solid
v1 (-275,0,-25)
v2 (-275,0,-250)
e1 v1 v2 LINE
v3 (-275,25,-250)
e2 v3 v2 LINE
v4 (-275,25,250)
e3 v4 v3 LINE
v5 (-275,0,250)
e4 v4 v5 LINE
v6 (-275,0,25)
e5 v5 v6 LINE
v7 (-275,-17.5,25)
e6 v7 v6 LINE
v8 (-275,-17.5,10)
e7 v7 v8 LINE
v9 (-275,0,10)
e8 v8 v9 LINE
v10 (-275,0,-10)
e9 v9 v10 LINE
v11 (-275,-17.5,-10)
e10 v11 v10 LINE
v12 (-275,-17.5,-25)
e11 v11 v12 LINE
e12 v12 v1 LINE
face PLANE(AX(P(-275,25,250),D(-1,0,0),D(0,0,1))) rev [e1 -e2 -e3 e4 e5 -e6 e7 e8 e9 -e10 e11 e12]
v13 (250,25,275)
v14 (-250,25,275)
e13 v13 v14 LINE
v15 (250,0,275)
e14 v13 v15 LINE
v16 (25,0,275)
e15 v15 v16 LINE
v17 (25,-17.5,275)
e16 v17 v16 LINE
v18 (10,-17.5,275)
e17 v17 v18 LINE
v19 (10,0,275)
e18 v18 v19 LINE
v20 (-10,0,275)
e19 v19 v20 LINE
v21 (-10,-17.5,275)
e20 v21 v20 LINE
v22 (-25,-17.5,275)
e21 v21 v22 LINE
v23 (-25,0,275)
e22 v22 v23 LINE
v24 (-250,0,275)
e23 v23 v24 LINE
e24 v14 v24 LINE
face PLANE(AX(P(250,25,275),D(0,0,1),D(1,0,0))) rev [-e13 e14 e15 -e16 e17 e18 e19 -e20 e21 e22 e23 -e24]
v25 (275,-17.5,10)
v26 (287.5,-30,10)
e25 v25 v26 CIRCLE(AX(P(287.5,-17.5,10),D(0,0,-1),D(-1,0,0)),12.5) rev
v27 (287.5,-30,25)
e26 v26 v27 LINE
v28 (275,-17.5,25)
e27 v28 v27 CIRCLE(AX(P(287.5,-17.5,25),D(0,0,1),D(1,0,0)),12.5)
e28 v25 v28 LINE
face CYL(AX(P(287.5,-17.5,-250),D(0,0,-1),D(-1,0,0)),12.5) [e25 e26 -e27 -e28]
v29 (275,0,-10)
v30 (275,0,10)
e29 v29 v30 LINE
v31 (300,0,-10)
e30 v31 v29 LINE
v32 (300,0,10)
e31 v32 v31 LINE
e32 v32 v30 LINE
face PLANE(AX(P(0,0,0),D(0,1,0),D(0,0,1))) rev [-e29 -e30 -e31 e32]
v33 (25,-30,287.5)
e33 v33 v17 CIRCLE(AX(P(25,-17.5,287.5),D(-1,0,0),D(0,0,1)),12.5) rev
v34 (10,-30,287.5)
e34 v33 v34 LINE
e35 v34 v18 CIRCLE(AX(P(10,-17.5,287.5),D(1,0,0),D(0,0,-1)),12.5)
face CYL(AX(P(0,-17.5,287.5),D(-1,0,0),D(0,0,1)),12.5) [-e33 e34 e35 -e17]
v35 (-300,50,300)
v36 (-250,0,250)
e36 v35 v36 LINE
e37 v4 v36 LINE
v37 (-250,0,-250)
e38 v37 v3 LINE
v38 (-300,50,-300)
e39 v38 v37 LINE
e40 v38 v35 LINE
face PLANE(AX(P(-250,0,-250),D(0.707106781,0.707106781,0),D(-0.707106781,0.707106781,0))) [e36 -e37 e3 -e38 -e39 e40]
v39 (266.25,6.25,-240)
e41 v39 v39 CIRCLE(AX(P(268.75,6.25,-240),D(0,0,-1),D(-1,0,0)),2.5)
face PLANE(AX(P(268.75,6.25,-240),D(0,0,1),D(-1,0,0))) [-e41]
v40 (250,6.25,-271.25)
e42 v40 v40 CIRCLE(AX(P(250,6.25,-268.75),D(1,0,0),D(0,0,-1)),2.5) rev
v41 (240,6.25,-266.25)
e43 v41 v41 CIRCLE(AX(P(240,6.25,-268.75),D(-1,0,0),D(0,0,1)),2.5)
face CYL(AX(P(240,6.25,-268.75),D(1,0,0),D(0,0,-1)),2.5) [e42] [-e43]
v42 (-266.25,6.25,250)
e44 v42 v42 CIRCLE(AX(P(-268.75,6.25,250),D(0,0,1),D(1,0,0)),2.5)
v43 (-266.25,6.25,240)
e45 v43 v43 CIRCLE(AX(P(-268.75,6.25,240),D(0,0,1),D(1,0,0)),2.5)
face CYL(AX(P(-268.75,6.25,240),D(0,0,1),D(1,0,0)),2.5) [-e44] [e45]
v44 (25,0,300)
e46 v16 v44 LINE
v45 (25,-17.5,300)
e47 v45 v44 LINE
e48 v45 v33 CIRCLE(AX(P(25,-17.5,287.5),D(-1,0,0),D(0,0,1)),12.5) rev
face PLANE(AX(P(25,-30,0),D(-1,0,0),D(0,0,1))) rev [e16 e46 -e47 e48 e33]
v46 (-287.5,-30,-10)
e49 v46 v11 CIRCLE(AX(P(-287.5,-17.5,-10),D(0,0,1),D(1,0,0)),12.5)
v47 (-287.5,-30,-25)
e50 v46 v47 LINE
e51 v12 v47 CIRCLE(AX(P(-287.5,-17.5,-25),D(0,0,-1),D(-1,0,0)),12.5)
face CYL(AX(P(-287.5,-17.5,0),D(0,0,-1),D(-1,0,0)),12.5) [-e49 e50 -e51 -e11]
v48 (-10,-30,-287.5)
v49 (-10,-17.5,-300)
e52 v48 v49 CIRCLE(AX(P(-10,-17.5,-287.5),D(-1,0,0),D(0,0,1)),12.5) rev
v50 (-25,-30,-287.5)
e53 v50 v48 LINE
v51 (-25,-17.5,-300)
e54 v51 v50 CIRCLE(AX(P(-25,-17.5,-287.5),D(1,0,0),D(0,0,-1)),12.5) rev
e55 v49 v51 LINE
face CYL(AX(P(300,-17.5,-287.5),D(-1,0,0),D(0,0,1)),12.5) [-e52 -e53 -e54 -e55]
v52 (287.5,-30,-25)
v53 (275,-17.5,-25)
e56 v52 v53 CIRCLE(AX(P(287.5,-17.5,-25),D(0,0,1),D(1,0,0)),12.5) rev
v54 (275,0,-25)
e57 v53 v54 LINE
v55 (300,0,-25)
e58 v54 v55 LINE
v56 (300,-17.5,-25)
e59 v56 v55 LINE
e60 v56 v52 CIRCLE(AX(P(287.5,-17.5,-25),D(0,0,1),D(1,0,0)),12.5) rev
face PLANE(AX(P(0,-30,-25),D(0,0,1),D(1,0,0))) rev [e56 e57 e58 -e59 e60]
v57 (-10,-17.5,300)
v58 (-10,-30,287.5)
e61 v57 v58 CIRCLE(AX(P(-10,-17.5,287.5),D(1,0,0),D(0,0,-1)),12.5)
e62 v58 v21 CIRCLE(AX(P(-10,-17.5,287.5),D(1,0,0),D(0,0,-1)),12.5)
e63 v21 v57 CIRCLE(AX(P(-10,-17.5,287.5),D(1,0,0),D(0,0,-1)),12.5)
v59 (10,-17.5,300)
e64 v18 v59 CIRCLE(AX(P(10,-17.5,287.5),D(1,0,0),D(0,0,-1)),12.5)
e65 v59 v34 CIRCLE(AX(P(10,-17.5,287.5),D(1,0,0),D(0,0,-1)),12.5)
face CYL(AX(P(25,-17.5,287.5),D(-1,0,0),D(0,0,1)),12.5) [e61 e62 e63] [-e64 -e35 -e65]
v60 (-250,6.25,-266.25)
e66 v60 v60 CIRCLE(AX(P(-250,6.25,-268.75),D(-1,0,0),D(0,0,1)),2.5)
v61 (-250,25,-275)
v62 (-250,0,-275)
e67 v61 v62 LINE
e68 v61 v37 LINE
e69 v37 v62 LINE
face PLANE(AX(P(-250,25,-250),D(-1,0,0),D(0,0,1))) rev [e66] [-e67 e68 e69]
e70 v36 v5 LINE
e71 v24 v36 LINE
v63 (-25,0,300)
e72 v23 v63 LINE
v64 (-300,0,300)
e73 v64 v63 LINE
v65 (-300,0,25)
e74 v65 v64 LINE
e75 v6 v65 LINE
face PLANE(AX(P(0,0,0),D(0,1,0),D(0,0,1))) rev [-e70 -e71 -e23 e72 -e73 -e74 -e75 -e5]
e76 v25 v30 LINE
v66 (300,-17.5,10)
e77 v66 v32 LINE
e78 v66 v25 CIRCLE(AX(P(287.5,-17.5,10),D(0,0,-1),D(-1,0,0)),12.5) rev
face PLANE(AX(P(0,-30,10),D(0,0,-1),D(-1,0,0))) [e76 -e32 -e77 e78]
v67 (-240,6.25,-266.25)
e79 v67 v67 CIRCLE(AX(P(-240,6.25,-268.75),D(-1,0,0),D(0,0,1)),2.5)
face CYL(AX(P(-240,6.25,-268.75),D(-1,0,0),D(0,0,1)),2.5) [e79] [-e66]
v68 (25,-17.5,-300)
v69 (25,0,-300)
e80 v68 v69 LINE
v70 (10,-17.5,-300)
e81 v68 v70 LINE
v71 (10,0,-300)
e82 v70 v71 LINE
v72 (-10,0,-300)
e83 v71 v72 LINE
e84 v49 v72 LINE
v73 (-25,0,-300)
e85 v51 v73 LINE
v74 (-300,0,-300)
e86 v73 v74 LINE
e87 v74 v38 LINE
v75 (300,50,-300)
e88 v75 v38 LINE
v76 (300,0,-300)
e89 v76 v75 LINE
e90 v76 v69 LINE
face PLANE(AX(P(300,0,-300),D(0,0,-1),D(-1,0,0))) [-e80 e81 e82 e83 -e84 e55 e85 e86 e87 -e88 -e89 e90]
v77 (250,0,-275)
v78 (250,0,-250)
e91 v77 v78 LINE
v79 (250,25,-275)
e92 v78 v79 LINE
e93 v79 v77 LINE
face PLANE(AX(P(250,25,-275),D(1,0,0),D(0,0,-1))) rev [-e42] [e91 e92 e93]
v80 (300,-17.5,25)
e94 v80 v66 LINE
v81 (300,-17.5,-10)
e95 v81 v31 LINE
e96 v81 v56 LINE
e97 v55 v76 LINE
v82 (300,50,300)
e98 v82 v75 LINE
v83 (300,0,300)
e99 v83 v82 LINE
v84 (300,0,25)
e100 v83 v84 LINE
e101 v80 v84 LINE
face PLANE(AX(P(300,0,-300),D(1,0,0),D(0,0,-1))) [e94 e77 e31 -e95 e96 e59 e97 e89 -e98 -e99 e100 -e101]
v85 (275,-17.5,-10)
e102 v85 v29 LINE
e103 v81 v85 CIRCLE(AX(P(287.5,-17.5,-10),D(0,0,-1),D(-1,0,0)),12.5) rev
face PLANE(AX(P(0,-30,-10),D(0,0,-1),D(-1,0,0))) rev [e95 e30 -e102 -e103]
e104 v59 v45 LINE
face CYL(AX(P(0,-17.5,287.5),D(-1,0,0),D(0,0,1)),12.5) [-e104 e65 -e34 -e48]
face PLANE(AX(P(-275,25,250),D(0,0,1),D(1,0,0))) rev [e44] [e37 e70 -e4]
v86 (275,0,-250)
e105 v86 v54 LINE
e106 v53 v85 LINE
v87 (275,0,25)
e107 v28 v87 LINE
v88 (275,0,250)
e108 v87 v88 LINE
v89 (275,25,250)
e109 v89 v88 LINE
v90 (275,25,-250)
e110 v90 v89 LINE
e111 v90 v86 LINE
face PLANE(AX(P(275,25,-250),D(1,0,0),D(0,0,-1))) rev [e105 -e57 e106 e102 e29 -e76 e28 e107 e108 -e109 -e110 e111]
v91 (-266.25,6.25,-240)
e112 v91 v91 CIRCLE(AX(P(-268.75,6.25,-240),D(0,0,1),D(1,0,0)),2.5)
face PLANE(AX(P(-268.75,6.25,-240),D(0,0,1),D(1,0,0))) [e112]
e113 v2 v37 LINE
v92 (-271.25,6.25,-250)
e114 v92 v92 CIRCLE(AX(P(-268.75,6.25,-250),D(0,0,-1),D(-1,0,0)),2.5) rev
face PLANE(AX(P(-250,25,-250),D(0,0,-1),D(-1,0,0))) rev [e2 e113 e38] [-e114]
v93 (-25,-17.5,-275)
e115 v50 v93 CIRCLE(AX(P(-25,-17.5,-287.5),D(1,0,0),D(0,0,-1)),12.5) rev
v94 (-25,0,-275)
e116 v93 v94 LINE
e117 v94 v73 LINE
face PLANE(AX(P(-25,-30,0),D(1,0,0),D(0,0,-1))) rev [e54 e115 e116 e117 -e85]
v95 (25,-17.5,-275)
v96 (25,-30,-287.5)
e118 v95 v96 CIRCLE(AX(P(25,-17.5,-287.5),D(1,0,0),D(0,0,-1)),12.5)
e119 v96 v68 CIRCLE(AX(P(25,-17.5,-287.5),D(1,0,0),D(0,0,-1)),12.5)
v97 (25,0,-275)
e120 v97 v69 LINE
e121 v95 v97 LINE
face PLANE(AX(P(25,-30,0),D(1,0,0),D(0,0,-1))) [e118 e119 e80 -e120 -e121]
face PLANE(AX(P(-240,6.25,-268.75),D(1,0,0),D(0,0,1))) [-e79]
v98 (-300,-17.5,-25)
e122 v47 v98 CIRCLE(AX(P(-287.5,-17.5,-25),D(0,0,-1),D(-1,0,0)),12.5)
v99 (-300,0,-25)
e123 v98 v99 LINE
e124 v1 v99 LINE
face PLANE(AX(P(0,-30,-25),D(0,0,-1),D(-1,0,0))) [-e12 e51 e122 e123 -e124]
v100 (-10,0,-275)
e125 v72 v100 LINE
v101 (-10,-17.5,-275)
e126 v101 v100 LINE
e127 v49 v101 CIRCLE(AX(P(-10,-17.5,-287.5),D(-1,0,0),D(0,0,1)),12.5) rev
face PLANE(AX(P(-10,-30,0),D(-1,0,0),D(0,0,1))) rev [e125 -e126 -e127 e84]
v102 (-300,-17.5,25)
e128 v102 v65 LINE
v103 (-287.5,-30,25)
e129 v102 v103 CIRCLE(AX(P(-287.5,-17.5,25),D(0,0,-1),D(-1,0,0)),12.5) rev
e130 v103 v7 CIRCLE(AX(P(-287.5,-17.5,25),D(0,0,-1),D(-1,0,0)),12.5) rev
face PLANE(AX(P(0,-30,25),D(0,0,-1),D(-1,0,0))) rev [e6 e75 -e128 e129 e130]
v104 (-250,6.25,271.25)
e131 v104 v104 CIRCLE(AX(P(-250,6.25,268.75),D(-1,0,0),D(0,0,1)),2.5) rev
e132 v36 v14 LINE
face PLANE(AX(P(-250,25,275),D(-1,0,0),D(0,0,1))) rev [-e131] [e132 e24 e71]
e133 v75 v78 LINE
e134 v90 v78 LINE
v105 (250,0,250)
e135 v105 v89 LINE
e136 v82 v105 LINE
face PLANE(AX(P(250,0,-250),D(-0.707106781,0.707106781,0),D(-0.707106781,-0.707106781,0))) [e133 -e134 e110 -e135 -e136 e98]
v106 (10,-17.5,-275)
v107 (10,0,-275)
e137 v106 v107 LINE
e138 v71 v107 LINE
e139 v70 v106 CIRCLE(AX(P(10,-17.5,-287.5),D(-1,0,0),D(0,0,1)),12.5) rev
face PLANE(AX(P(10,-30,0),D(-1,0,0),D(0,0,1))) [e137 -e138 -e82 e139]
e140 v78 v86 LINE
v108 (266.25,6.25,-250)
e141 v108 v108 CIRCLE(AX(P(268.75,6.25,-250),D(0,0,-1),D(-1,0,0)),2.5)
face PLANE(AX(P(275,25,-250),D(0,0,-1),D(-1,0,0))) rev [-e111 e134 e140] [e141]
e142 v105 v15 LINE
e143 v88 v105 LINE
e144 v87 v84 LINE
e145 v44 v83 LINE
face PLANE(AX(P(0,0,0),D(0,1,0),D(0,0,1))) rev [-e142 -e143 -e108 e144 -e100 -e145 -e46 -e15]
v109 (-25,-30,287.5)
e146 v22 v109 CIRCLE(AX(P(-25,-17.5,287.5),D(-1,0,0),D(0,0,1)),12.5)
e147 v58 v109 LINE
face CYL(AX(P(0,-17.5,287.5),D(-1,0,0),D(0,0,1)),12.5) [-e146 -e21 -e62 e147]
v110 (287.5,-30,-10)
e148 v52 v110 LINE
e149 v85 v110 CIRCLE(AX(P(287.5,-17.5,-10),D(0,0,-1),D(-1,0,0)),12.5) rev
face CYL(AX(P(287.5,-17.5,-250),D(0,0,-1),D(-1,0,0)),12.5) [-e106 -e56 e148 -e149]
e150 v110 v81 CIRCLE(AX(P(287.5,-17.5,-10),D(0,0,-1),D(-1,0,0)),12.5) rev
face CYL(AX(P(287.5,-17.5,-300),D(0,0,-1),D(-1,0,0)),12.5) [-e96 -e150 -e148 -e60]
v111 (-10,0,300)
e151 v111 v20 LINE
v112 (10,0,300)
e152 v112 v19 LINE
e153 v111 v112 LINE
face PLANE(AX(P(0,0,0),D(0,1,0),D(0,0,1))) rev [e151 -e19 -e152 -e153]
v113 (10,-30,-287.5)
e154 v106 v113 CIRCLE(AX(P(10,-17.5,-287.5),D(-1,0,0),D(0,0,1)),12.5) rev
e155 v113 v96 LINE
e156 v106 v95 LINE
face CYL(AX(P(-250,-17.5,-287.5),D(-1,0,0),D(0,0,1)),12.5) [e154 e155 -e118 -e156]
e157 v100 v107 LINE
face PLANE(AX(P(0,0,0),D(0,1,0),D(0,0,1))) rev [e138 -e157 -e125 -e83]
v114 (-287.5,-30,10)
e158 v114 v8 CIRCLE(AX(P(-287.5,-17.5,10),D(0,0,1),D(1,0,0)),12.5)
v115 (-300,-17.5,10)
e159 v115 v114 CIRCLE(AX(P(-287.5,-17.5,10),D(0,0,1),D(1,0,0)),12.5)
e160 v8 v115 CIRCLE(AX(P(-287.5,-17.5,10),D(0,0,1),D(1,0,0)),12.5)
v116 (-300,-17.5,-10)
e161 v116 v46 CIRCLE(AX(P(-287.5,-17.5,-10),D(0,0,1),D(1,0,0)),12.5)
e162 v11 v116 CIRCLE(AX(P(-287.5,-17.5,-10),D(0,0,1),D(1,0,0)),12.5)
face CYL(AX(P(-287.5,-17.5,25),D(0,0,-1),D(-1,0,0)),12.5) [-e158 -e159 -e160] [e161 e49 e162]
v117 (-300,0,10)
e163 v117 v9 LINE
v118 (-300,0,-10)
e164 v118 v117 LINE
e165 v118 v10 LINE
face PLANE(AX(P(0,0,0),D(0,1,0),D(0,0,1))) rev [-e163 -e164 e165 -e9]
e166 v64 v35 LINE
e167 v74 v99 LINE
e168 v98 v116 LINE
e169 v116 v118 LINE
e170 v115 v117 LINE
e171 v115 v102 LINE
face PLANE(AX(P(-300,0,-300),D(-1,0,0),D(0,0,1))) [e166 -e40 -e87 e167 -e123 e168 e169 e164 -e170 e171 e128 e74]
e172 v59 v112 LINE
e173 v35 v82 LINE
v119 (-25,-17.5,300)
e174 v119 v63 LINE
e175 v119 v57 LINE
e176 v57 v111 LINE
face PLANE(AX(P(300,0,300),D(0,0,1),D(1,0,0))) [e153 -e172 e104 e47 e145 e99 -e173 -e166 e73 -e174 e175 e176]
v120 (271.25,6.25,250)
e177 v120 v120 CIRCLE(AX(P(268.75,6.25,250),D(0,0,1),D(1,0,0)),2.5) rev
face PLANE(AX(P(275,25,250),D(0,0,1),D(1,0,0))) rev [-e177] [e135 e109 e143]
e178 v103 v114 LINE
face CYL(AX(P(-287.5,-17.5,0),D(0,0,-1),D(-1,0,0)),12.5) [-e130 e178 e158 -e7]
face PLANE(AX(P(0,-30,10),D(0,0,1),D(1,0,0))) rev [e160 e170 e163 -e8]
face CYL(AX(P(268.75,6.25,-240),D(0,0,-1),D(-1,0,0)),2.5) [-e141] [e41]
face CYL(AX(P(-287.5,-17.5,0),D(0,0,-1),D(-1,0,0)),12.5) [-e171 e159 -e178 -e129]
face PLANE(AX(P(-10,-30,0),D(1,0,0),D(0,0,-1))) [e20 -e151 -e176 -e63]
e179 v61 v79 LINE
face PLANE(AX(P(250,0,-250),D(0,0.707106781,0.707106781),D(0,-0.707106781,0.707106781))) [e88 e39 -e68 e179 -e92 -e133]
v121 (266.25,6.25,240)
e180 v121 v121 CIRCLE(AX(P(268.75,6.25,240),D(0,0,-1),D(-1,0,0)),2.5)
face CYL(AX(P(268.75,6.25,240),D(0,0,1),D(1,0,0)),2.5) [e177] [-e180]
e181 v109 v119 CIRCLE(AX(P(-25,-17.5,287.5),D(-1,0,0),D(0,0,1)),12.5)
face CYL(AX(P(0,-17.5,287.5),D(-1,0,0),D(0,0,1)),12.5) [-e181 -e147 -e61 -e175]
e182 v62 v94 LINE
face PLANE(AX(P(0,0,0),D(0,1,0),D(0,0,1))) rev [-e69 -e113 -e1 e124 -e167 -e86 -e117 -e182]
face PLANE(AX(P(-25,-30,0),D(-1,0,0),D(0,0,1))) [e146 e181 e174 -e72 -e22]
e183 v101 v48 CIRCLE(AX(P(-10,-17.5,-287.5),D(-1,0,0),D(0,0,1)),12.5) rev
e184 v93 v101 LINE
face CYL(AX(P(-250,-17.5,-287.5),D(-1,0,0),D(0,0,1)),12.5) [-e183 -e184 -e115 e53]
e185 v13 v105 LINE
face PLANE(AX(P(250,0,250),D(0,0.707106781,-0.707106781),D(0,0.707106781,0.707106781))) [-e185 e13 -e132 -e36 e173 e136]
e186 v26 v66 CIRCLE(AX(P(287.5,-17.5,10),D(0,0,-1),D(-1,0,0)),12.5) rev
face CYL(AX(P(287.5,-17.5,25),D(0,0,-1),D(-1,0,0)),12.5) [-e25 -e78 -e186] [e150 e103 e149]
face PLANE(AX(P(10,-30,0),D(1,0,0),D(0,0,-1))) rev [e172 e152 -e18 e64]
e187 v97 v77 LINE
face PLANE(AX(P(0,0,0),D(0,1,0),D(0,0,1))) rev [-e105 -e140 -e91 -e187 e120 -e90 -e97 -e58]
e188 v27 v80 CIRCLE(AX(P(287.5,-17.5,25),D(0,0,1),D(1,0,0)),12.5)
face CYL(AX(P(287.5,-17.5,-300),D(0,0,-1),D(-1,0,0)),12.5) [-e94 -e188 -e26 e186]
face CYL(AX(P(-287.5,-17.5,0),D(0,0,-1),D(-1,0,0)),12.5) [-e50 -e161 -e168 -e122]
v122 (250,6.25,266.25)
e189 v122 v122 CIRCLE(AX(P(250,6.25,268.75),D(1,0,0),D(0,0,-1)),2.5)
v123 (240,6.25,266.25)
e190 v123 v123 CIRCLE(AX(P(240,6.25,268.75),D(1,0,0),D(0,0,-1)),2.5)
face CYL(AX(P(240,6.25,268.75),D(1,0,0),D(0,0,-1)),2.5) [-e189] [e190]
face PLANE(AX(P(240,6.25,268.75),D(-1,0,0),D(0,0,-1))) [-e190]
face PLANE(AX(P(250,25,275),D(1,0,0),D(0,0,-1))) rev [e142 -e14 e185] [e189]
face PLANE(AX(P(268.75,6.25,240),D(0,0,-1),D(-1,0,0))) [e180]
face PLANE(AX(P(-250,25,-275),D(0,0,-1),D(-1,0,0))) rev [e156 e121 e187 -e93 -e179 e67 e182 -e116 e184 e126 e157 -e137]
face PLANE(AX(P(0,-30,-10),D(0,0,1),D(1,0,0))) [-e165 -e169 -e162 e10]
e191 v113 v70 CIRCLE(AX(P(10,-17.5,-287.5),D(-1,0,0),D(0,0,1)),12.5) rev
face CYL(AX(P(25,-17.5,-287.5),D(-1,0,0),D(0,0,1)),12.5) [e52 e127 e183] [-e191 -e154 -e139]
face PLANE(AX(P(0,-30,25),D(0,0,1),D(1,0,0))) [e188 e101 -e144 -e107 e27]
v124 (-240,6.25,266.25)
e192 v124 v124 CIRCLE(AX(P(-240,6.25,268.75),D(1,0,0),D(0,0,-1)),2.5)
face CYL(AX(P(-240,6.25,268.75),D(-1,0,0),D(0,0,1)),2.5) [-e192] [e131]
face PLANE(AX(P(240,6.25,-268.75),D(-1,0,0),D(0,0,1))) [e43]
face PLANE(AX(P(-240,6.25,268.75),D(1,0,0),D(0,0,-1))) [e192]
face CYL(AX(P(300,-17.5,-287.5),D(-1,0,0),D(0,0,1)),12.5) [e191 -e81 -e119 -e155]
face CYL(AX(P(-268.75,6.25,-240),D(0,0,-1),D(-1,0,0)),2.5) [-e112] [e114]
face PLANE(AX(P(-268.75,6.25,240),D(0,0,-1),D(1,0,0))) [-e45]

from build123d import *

# Parameters (mm, degrees)
SKETCH1_W                                  = 700
SKETCH1_H                                  = 700
SKETCH1_W_2                                = 500
SKETCH1_H_2                                = 500
BOSS_EXTRUDE2_DEPTH                        = 50
BOSS_EXTRUDE2_DRAFT                        = 45
SKETCH6_W                                  = 700
SKETCH6_H                                  = 700
SKETCH6_W_2                                = 600
SKETCH6_H_2                                = 600
CUT_EXTRUDE1_DEPTH                         = 50
CUT_EXTRUDE2_DEPTH                         = 25
SKETCH8_R                                  = 2.5
BOSS_EXTRUDE3_DEPTH                        = 10
MIRROR1_AT_THE_SECOND_PLANE_COPY_1_SKETC_R = 2.5
MIRROR1_AT_THE_SECOND_PLANE_COPY_1_DEPTH   = 10
MIRROR2_COPY_1_SKETCH_R                    = 2.5
MIRROR2_COPY_1_DEPTH                       = 10
MIRROR2_COPY_2_SKETCH_R                    = 2.5
MIRROR2_COPY_2_DEPTH                       = 10
MIRROR2_COPY_3_SKETCH_R                    = 2.5
MIRROR2_COPY_3_DEPTH                       = 10
SKETCH9_W                                  = 25
SKETCH9_H                                  = 15
BOSS_EXTRUDE4_DEPTH                        = 30
SKETCH11_R                                 = 12.5
BOSS_EXTRUDE5_DEPTH                        = 50
FILLET1_R                                  = 12.5
FILLET1_OF_MIRROR3_R                       = 12.5
MIRROR4_START                              = -25
MIRROR4_OUTLINE_R                          = 12.5
MIRROR4_DEPTH                              = 50
MIRROR4_2_DEPTH                            = 15
MIRROR4_START_2                            = 10
MIRROR4_3_DEPTH                            = 15


# Read off the part's stored shape, not the designer's step: Mirror4
with BuildPart() as part:
    # Sketch1 → Boss-Extrude2 (with draft: the straight prism first)
    with BuildSketch(Plane(origin=(0, 0, 0), x_dir=(1, 0, 0), z_dir=(0, 1, 0))):
        Rectangle(SKETCH1_W, SKETCH1_H)
        Rectangle(SKETCH1_W_2, SKETCH1_H_2, mode=Mode.SUBTRACT)
    extrude(amount=BOSS_EXTRUDE2_DEPTH)
    # Boss-Extrude2: the draft: its side faces are tilted about the plane it starts from
    boss_extrude2_sides = [part.faces().sort_by_distance(p)[0] for p in [
        (-350, 25, 0),
        (0, 25, 350),
        (350, 25, 0),
        (0, 25, -350),
        (250, 25, 0),
        (0, 25, 250),
        (-250, 25, 0),
        (0, 25, -250),
    ]]
    draft(boss_extrude2_sides, Plane(origin=(0, 0, 0), x_dir=(1, 0, 0), z_dir=(0, 1, 0)), BOSS_EXTRUDE2_DRAFT)

    # Sketch6 → Cut-Extrude1 (cut)
    with BuildSketch(Plane(origin=(0, 50, 0), x_dir=(1, 0, 0), z_dir=(0, 1, 0))):
        Rectangle(SKETCH6_W, SKETCH6_H)
        Rectangle(SKETCH6_W_2, SKETCH6_H_2, mode=Mode.SUBTRACT)
    extrude(amount=-CUT_EXTRUDE1_DEPTH, mode=Mode.SUBTRACT)

    # Sketch7 → Cut-Extrude2 (cut)
    with BuildSketch(Plane.XZ):
        Polygon((-275, 250), (-250, 250), (-250, 275), (250, 275), (250, 250), (275, 250), (275, -250), (250, -250), (250, -275), (-250, -275), (-250, -250), (-275, -250), align=None)
    extrude(amount=-CUT_EXTRUDE2_DEPTH, mode=Mode.SUBTRACT)

    # Sketch8 → Boss-Extrude3 (add)
    with BuildSketch(Plane.XY.offset(-250)):
        with Locations(Location((-268.75, 6.25, 0), (0, 0, 180))):
            Circle(SKETCH8_R)
    boss_extrude3 = extrude(amount=BOSS_EXTRUDE3_DEPTH)

    # Mirror1: Boss-Extrude3 across plane
    add(boss_extrude3.mirror(Plane(origin=(0, 0, 0), x_dir=(0, 0, 1), z_dir=(1, 0, 0))))

    # Mirror1 at the second plane: Boss-Extrude3 across plane
    add(boss_extrude3.mirror(Plane.XY))

    # Mirror1 at the second plane copy 1 sketc → Mirror1 at the second plane copy 1 (add)
    with BuildSketch(Plane(origin=(0, 0, 250), x_dir=(-1, 0, 0), z_dir=(0, 0, -1))):
        with Locations(Location((-268.75, 6.25, 0), (0, 0, 180))):
            Circle(MIRROR1_AT_THE_SECOND_PLANE_COPY_1_SKETC_R)
    extrude(amount=MIRROR1_AT_THE_SECOND_PLANE_COPY_1_DEPTH)

    # Mirror2: Boss-Extrude3 across plane
    add(boss_extrude3.mirror(Plane(origin=(0, 0, 0), x_dir=(0.7071067811865477, 0, 0.7071067811865474), z_dir=(-0.7071067811865474, 0, 0.7071067811865477))))

    # Mirror2 copy 1 sketch → Mirror2 copy 1 (add)
    with BuildSketch(Plane(origin=(-250, 0, 0), x_dir=(0, 0, -1), z_dir=(1, 0, 0))):
        with Locations(Location((-268.75, 6.25, 0), (0, 0, 180))):
            Circle(MIRROR2_COPY_1_SKETCH_R)
    extrude(amount=MIRROR2_COPY_1_DEPTH)

    # Mirror2 copy 2 sketch → Mirror2 copy 2 (add)
    with BuildSketch(Plane.ZY.offset(-250)):
        with Locations(Location((-268.75, 6.25, 0), (0, 0, 180))):
            Circle(MIRROR2_COPY_2_SKETCH_R)
    extrude(amount=MIRROR2_COPY_2_DEPTH)

    # Mirror2 copy 3 sketch → Mirror2 copy 3 (add)
    with BuildSketch(Plane(origin=(250, 0, 0), x_dir=(0, 0, -1), z_dir=(-1, 0, 0))):
        with Locations((-268.75, -6.25)):
            Circle(MIRROR2_COPY_3_SKETCH_R)
    extrude(amount=MIRROR2_COPY_3_DEPTH)

    # Sketch9 → Boss-Extrude4 (add)
    with BuildSketch(Plane.XZ):
        with Locations((-287.5, 17.5)):
            Rectangle(SKETCH9_W, SKETCH9_H)
        with Locations((-287.5, -17.5)):
            Rectangle(SKETCH9_W, SKETCH9_H)
    boss_extrude4 = extrude(amount=BOSS_EXTRUDE4_DEPTH)

    # Sketch11 → Boss-Extrude5 (add)
    with BuildSketch(Plane(origin=(0, 0, -25), x_dir=(-1, 0, 0), z_dir=(0, 0, -1))):
        with Locations((287.5, -17.5)):
            Circle(SKETCH11_R)
    boss_extrude5 = extrude(amount=-BOSS_EXTRUDE5_DEPTH)

    # Fillet1
    fillet1_edges = [part.edges().sort_by_distance(p)[0] for p in [
        (-275, -30, -17.5),
        (-275, -30, 17.5),
        (-300, -30, 17.5),
        (-300, -30, -17.5),
    ]]
    fillet(fillet1_edges, radius=FILLET1_R - 0.0001)  # a hair under: the kernel refuses the full size

    # Mirror3: Boss-Extrude4, Boss-Extrude5 across plane
    add(boss_extrude4.mirror(Plane(origin=(0, 0, 0), x_dir=(0, 0, 1), z_dir=(1, 0, 0))))
    add(boss_extrude5.mirror(Plane(origin=(0, 0, 0), x_dir=(0, 0, 1), z_dir=(1, 0, 0))))

    # Fillet1 of Mirror3
    fillet1_of_mirror3_edges = [part.edges().sort_by_distance(p)[0] for p in [
        (275, -30, -17.5),
        (275, -30, 17.5),
        (300, -30, 17.5),
        (300, -30, -17.5),
    ]]
    fillet(fillet1_of_mirror3_edges, radius=FILLET1_OF_MIRROR3_R - 0.0001)  # a hair under: the kernel refuses the full size



with BuildPart() as body_2:
    # Mirror4 outline → Mirror4 (new body)
    with BuildSketch(Plane.YZ.offset(MIRROR4_START)):
        with Locations((-17.5, 287.5)):
            Circle(MIRROR4_OUTLINE_R)
        with Locations((-17.5, -287.5)):
            Circle(MIRROR4_OUTLINE_R)
    extrude(amount=MIRROR4_DEPTH)


with BuildPart() as part_1:
    add(part.part)

    add(body_2.part)  # Mirror4 2 merges body 2
    # Mirror4 2 outline → Mirror4 2 (add)
    with BuildSketch(Plane.YZ.offset(MIRROR4_START)):
        with BuildLine():
            ThreePointArc((-17.5, 300), (-5, 287.5), (-17.5, 275))
            Line((-17.5, 275), (0, 275))
            Line((0, 275), (0, 300))
            Line((0, 300), (-17.5, 300))
        make_face()
        with BuildLine():
            ThreePointArc((-17.5, -275), (-5, -287.5), (-17.5, -300))
            Line((-17.5, -300), (0, -300))
            Line((0, -300), (0, -275))
            Line((0, -275), (-17.5, -275))
        make_face()
    extrude(amount=MIRROR4_2_DEPTH)

    # Mirror4 3 outline → Mirror4 3 (add)
    with BuildSketch(Plane.YZ.offset(MIRROR4_START_2)):
        with BuildLine():
            ThreePointArc((-17.5, 300), (-5, 287.5), (-17.5, 275))
            Line((-17.5, 275), (0, 275))
            Line((0, 275), (0, 300))
            Line((0, 300), (-17.5, 300))
        make_face()
        with BuildLine():
            ThreePointArc((-17.5, -275), (-5, -287.5), (-17.5, -300))
            Line((-17.5, -300), (0, -300))
            Line((0, -300), (0, -275))
            Line((0, -275), (-17.5, -275))
        make_face()
    extrude(amount=MIRROR4_3_DEPTH)


solid = part_1.part
